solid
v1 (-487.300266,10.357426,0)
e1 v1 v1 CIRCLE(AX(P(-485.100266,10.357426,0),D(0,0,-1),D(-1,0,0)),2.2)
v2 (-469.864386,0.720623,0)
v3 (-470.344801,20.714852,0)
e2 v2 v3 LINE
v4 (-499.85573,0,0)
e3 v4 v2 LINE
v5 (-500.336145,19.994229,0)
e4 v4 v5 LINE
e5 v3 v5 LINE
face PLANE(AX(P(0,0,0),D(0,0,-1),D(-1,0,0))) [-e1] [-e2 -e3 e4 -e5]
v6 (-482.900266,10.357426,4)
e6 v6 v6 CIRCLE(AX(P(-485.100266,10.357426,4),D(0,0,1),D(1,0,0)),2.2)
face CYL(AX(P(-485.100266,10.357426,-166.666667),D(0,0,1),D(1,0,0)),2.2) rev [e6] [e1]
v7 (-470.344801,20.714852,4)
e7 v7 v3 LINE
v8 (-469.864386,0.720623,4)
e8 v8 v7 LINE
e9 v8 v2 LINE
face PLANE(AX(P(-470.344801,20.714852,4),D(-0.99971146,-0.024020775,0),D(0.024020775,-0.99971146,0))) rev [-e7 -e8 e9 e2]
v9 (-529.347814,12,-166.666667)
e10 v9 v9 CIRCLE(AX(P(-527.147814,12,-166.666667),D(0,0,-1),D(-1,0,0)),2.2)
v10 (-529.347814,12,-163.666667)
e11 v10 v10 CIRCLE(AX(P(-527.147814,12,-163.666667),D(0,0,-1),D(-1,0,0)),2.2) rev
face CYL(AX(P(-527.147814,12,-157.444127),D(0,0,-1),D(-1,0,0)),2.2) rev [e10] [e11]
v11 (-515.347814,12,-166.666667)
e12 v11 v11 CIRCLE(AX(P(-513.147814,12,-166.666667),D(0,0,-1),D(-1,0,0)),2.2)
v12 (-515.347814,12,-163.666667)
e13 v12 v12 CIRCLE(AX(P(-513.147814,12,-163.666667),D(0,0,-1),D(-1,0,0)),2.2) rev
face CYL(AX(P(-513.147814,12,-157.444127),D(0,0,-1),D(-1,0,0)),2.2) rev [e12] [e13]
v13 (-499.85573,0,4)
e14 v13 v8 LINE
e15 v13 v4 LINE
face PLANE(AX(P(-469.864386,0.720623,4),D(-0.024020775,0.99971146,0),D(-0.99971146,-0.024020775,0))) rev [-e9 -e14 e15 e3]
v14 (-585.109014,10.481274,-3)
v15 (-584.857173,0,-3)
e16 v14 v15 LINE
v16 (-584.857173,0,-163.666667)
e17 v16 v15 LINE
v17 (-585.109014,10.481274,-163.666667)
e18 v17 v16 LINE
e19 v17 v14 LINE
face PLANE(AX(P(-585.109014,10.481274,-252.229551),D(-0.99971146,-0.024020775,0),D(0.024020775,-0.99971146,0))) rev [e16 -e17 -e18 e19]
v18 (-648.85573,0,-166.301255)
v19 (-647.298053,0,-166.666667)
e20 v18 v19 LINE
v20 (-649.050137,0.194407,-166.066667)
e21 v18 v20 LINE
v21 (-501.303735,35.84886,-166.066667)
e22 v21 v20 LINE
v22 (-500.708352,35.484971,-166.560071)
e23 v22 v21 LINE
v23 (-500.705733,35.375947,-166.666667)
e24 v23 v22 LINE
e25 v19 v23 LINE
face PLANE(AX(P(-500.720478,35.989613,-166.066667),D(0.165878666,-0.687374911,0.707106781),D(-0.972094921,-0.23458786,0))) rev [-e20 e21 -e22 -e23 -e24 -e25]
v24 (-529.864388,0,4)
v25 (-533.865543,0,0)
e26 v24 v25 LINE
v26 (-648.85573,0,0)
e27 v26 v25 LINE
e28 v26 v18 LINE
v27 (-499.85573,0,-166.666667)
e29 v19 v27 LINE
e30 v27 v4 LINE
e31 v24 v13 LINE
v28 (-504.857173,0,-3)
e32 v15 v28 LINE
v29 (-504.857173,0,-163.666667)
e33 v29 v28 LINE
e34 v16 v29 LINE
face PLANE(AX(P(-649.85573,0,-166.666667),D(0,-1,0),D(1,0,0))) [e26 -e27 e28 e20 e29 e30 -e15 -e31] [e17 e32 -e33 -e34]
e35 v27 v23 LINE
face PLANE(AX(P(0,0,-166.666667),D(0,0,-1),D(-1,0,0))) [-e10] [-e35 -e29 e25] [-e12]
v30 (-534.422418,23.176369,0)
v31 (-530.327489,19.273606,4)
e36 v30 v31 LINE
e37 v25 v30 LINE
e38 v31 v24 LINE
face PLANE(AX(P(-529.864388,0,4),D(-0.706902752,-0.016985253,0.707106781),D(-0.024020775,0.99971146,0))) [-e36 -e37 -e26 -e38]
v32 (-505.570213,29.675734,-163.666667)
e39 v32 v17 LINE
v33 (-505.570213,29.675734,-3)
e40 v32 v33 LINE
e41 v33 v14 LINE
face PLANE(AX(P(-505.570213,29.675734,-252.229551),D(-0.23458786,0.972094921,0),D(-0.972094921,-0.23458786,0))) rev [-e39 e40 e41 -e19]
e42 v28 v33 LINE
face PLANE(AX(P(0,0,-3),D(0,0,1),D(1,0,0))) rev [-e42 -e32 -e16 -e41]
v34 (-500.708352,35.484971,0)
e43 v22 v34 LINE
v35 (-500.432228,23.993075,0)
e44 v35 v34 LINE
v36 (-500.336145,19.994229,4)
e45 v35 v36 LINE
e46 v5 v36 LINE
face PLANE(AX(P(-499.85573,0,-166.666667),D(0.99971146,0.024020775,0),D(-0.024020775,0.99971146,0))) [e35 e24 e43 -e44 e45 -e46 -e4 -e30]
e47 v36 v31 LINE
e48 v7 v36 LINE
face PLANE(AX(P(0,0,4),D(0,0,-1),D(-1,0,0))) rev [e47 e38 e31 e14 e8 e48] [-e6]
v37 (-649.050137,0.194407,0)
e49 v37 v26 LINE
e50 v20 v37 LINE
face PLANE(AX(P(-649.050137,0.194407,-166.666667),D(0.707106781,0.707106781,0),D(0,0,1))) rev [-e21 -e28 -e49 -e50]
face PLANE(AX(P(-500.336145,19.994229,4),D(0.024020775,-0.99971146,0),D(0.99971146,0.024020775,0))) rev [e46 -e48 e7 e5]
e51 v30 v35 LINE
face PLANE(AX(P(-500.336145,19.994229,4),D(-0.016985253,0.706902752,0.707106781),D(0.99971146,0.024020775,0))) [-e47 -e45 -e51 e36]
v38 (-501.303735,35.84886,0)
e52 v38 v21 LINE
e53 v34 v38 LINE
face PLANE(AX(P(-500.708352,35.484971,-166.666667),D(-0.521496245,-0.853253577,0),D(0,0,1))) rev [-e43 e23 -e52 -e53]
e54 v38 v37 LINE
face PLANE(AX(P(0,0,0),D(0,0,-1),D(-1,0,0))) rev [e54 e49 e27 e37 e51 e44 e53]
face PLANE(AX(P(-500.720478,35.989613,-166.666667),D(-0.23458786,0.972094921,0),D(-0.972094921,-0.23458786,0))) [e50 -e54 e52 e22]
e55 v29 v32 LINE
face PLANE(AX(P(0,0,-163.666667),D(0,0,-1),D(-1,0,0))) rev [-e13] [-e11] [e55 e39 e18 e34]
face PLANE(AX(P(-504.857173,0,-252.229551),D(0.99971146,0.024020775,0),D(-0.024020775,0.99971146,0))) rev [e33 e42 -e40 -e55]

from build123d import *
from OCP.BRepFilletAPI import BRepFilletAPI_MakeChamfer

# Parameters (mm, degrees)
BOSS_EXTRUDE1_DEPTH = 166.66666666666666
CUT_EXTRUDE1_DEPTH  = 160.666666667
BOSS_EXTRUDE2_DEPTH = 4
SKETCH9_R           = 2.1999999999999833
CUT_EXTRUDE3_DEPTH  = 673.8557295952264
SKETCH10_R          = 2.1999999999999833
CUT_EXTRUDE4_DEPTH  = 3
CHAMFER3_SIZE       = 0.6
CHAMFER3_SIZE2      = 0.5047874406768073
CHAMFER4_SIZE       = 1
CHAMFER4_SIZE2      = 0.8287182147663876
CHAMFER8_SIZE       = 4
CHAMFER9_SIZE       = 4


with BuildPart() as part:
    # Sketch4 → Boss-Extrude1 (new body)
    with BuildSketch(Plane.XY):
        Polygon((-500.7204776760873, 35.989612544106855), (-649.8557297792629, -1.837e-14), (-499.8557297792629, -6.121e-14), align=None)
    extrude(amount=-BOSS_EXTRUDE1_DEPTH)

    # Sketch6 → Cut-Extrude1 (cut)
    with BuildSketch(Plane.XY.offset(-3)):
        Polygon((-504.85717289786834, -1.837e-14), (-505.570212772658, 29.675734299461347), (-585.1090138943516, 10.481274275937695), (-584.8571728978683, -1.837e-14), align=None)
    extrude(amount=-CUT_EXTRUDE1_DEPTH, mode=Mode.SUBTRACT)

    # Sketch8 → Boss-Extrude2 (add)
    with BuildSketch(Plane.XY):
        Polygon((-500.3361452774986, 19.994229191170454), (-470.34480149074295, 20.714852438524037), (-469.86438599250715, 0.720623247353527), (-499.8557297792629, -6.121e-14), (-529.8643884908956, -2.204e-14), (-530.3274890642546, 19.273605943816776), align=None)
    extrude(amount=BOSS_EXTRUDE2_DEPTH)

    # Sketch9 → Cut-Extrude3 (cut, through all)
    with BuildSketch(Plane.XY.offset(4)):
        with Locations((-485.1002656350029, 10.357426219261987)):
            Circle(SKETCH9_R)
    extrude(amount=-CUT_EXTRUDE3_DEPTH, mode=Mode.SUBTRACT)

    # Sketch10 → Cut-Extrude4 (cut)
    with BuildSketch(Plane(origin=(0, 0, -166.66666666666666), x_dir=(-1, 0, 0), z_dir=(0, 0, -1))):
        with Locations((513.1478143821638, 11.99999999999998)):
            Circle(SKETCH10_R)
        with Locations((527.1478143821638, 11.99999999999998)):
            Circle(SKETCH10_R)
    extrude(amount=-CUT_EXTRUDE4_DEPTH, mode=Mode.SUBTRACT)

    # Chamfer3: one chamfer whose edges measure the first distance from different faces: ONE call of the kernel's chamfer builder (chamfer() names one face for all edges)
    chamfer3_edges_1 = [part.edges().sort_by_distance(p)[0] for p in [
        (-500.7204776760873, 35.989612544106855, -83.33333333333333),
    ]]
    chamfer3_side_1 = [part.faces().sort_by_distance(p)[0] for p in [
        (-575.2881037276751, 17.994806272053417, -83.33333333333333),
    ]]
    chamfer3_edges_2 = [part.edges().sort_by_distance(p)[0] for p in [
        (-575.2881037276751, 17.994806272053417, -166.66666666666666),
    ]]
    chamfer3 = BRepFilletAPI_MakeChamfer(part.part.solid().wrapped)
    for e in chamfer3_edges_1:
        chamfer3.Add(CHAMFER3_SIZE, CHAMFER3_SIZE2, e.wrapped, chamfer3_side_1[0].wrapped)  # the first distance lies on this face
    for e in chamfer3_edges_2:
        chamfer3.Add(CHAMFER3_SIZE, e.wrapped)
    add(Compound.cast(chamfer3.Shape()), mode=Mode.REPLACE)

    # Chamfer4
    chamfer4_edges = [part.edges().sort_by_distance(p)[0] for p in [
        (-649.8557297792629, -1.837e-14, -83.03333333333336),
    ]]
    chamfer4_side = [part.faces().sort_by_distance(p)[0] for p in [
        (-605.6991208479849, -3.098e-14, -82.49305945140193),
    ]]
    chamfer(chamfer4_edges, length=CHAMFER4_SIZE, length2=CHAMFER4_SIZE2, reference=chamfer4_side[0])

    # Chamfer8
    chamfer8_edges = [part.edges().sort_by_distance(p)[0] for p in [
        (-515.3318171708765, 19.633917567493594, 0),
    ]]
    chamfer(chamfer8_edges, length=CHAMFER8_SIZE - 0.0001)  # a hair under: the kernel refuses the full size

    # Chamfer9
    chamfer9_edges = [part.edges().sort_by_distance(p)[0] for p in [
        (-530.1439791263599, 11.636175905452475, 0),
    ]]
    chamfer(chamfer9_edges, length=CHAMFER9_SIZE - 0.0001)  # a hair under: the kernel refuses the full size


solid = part.part
